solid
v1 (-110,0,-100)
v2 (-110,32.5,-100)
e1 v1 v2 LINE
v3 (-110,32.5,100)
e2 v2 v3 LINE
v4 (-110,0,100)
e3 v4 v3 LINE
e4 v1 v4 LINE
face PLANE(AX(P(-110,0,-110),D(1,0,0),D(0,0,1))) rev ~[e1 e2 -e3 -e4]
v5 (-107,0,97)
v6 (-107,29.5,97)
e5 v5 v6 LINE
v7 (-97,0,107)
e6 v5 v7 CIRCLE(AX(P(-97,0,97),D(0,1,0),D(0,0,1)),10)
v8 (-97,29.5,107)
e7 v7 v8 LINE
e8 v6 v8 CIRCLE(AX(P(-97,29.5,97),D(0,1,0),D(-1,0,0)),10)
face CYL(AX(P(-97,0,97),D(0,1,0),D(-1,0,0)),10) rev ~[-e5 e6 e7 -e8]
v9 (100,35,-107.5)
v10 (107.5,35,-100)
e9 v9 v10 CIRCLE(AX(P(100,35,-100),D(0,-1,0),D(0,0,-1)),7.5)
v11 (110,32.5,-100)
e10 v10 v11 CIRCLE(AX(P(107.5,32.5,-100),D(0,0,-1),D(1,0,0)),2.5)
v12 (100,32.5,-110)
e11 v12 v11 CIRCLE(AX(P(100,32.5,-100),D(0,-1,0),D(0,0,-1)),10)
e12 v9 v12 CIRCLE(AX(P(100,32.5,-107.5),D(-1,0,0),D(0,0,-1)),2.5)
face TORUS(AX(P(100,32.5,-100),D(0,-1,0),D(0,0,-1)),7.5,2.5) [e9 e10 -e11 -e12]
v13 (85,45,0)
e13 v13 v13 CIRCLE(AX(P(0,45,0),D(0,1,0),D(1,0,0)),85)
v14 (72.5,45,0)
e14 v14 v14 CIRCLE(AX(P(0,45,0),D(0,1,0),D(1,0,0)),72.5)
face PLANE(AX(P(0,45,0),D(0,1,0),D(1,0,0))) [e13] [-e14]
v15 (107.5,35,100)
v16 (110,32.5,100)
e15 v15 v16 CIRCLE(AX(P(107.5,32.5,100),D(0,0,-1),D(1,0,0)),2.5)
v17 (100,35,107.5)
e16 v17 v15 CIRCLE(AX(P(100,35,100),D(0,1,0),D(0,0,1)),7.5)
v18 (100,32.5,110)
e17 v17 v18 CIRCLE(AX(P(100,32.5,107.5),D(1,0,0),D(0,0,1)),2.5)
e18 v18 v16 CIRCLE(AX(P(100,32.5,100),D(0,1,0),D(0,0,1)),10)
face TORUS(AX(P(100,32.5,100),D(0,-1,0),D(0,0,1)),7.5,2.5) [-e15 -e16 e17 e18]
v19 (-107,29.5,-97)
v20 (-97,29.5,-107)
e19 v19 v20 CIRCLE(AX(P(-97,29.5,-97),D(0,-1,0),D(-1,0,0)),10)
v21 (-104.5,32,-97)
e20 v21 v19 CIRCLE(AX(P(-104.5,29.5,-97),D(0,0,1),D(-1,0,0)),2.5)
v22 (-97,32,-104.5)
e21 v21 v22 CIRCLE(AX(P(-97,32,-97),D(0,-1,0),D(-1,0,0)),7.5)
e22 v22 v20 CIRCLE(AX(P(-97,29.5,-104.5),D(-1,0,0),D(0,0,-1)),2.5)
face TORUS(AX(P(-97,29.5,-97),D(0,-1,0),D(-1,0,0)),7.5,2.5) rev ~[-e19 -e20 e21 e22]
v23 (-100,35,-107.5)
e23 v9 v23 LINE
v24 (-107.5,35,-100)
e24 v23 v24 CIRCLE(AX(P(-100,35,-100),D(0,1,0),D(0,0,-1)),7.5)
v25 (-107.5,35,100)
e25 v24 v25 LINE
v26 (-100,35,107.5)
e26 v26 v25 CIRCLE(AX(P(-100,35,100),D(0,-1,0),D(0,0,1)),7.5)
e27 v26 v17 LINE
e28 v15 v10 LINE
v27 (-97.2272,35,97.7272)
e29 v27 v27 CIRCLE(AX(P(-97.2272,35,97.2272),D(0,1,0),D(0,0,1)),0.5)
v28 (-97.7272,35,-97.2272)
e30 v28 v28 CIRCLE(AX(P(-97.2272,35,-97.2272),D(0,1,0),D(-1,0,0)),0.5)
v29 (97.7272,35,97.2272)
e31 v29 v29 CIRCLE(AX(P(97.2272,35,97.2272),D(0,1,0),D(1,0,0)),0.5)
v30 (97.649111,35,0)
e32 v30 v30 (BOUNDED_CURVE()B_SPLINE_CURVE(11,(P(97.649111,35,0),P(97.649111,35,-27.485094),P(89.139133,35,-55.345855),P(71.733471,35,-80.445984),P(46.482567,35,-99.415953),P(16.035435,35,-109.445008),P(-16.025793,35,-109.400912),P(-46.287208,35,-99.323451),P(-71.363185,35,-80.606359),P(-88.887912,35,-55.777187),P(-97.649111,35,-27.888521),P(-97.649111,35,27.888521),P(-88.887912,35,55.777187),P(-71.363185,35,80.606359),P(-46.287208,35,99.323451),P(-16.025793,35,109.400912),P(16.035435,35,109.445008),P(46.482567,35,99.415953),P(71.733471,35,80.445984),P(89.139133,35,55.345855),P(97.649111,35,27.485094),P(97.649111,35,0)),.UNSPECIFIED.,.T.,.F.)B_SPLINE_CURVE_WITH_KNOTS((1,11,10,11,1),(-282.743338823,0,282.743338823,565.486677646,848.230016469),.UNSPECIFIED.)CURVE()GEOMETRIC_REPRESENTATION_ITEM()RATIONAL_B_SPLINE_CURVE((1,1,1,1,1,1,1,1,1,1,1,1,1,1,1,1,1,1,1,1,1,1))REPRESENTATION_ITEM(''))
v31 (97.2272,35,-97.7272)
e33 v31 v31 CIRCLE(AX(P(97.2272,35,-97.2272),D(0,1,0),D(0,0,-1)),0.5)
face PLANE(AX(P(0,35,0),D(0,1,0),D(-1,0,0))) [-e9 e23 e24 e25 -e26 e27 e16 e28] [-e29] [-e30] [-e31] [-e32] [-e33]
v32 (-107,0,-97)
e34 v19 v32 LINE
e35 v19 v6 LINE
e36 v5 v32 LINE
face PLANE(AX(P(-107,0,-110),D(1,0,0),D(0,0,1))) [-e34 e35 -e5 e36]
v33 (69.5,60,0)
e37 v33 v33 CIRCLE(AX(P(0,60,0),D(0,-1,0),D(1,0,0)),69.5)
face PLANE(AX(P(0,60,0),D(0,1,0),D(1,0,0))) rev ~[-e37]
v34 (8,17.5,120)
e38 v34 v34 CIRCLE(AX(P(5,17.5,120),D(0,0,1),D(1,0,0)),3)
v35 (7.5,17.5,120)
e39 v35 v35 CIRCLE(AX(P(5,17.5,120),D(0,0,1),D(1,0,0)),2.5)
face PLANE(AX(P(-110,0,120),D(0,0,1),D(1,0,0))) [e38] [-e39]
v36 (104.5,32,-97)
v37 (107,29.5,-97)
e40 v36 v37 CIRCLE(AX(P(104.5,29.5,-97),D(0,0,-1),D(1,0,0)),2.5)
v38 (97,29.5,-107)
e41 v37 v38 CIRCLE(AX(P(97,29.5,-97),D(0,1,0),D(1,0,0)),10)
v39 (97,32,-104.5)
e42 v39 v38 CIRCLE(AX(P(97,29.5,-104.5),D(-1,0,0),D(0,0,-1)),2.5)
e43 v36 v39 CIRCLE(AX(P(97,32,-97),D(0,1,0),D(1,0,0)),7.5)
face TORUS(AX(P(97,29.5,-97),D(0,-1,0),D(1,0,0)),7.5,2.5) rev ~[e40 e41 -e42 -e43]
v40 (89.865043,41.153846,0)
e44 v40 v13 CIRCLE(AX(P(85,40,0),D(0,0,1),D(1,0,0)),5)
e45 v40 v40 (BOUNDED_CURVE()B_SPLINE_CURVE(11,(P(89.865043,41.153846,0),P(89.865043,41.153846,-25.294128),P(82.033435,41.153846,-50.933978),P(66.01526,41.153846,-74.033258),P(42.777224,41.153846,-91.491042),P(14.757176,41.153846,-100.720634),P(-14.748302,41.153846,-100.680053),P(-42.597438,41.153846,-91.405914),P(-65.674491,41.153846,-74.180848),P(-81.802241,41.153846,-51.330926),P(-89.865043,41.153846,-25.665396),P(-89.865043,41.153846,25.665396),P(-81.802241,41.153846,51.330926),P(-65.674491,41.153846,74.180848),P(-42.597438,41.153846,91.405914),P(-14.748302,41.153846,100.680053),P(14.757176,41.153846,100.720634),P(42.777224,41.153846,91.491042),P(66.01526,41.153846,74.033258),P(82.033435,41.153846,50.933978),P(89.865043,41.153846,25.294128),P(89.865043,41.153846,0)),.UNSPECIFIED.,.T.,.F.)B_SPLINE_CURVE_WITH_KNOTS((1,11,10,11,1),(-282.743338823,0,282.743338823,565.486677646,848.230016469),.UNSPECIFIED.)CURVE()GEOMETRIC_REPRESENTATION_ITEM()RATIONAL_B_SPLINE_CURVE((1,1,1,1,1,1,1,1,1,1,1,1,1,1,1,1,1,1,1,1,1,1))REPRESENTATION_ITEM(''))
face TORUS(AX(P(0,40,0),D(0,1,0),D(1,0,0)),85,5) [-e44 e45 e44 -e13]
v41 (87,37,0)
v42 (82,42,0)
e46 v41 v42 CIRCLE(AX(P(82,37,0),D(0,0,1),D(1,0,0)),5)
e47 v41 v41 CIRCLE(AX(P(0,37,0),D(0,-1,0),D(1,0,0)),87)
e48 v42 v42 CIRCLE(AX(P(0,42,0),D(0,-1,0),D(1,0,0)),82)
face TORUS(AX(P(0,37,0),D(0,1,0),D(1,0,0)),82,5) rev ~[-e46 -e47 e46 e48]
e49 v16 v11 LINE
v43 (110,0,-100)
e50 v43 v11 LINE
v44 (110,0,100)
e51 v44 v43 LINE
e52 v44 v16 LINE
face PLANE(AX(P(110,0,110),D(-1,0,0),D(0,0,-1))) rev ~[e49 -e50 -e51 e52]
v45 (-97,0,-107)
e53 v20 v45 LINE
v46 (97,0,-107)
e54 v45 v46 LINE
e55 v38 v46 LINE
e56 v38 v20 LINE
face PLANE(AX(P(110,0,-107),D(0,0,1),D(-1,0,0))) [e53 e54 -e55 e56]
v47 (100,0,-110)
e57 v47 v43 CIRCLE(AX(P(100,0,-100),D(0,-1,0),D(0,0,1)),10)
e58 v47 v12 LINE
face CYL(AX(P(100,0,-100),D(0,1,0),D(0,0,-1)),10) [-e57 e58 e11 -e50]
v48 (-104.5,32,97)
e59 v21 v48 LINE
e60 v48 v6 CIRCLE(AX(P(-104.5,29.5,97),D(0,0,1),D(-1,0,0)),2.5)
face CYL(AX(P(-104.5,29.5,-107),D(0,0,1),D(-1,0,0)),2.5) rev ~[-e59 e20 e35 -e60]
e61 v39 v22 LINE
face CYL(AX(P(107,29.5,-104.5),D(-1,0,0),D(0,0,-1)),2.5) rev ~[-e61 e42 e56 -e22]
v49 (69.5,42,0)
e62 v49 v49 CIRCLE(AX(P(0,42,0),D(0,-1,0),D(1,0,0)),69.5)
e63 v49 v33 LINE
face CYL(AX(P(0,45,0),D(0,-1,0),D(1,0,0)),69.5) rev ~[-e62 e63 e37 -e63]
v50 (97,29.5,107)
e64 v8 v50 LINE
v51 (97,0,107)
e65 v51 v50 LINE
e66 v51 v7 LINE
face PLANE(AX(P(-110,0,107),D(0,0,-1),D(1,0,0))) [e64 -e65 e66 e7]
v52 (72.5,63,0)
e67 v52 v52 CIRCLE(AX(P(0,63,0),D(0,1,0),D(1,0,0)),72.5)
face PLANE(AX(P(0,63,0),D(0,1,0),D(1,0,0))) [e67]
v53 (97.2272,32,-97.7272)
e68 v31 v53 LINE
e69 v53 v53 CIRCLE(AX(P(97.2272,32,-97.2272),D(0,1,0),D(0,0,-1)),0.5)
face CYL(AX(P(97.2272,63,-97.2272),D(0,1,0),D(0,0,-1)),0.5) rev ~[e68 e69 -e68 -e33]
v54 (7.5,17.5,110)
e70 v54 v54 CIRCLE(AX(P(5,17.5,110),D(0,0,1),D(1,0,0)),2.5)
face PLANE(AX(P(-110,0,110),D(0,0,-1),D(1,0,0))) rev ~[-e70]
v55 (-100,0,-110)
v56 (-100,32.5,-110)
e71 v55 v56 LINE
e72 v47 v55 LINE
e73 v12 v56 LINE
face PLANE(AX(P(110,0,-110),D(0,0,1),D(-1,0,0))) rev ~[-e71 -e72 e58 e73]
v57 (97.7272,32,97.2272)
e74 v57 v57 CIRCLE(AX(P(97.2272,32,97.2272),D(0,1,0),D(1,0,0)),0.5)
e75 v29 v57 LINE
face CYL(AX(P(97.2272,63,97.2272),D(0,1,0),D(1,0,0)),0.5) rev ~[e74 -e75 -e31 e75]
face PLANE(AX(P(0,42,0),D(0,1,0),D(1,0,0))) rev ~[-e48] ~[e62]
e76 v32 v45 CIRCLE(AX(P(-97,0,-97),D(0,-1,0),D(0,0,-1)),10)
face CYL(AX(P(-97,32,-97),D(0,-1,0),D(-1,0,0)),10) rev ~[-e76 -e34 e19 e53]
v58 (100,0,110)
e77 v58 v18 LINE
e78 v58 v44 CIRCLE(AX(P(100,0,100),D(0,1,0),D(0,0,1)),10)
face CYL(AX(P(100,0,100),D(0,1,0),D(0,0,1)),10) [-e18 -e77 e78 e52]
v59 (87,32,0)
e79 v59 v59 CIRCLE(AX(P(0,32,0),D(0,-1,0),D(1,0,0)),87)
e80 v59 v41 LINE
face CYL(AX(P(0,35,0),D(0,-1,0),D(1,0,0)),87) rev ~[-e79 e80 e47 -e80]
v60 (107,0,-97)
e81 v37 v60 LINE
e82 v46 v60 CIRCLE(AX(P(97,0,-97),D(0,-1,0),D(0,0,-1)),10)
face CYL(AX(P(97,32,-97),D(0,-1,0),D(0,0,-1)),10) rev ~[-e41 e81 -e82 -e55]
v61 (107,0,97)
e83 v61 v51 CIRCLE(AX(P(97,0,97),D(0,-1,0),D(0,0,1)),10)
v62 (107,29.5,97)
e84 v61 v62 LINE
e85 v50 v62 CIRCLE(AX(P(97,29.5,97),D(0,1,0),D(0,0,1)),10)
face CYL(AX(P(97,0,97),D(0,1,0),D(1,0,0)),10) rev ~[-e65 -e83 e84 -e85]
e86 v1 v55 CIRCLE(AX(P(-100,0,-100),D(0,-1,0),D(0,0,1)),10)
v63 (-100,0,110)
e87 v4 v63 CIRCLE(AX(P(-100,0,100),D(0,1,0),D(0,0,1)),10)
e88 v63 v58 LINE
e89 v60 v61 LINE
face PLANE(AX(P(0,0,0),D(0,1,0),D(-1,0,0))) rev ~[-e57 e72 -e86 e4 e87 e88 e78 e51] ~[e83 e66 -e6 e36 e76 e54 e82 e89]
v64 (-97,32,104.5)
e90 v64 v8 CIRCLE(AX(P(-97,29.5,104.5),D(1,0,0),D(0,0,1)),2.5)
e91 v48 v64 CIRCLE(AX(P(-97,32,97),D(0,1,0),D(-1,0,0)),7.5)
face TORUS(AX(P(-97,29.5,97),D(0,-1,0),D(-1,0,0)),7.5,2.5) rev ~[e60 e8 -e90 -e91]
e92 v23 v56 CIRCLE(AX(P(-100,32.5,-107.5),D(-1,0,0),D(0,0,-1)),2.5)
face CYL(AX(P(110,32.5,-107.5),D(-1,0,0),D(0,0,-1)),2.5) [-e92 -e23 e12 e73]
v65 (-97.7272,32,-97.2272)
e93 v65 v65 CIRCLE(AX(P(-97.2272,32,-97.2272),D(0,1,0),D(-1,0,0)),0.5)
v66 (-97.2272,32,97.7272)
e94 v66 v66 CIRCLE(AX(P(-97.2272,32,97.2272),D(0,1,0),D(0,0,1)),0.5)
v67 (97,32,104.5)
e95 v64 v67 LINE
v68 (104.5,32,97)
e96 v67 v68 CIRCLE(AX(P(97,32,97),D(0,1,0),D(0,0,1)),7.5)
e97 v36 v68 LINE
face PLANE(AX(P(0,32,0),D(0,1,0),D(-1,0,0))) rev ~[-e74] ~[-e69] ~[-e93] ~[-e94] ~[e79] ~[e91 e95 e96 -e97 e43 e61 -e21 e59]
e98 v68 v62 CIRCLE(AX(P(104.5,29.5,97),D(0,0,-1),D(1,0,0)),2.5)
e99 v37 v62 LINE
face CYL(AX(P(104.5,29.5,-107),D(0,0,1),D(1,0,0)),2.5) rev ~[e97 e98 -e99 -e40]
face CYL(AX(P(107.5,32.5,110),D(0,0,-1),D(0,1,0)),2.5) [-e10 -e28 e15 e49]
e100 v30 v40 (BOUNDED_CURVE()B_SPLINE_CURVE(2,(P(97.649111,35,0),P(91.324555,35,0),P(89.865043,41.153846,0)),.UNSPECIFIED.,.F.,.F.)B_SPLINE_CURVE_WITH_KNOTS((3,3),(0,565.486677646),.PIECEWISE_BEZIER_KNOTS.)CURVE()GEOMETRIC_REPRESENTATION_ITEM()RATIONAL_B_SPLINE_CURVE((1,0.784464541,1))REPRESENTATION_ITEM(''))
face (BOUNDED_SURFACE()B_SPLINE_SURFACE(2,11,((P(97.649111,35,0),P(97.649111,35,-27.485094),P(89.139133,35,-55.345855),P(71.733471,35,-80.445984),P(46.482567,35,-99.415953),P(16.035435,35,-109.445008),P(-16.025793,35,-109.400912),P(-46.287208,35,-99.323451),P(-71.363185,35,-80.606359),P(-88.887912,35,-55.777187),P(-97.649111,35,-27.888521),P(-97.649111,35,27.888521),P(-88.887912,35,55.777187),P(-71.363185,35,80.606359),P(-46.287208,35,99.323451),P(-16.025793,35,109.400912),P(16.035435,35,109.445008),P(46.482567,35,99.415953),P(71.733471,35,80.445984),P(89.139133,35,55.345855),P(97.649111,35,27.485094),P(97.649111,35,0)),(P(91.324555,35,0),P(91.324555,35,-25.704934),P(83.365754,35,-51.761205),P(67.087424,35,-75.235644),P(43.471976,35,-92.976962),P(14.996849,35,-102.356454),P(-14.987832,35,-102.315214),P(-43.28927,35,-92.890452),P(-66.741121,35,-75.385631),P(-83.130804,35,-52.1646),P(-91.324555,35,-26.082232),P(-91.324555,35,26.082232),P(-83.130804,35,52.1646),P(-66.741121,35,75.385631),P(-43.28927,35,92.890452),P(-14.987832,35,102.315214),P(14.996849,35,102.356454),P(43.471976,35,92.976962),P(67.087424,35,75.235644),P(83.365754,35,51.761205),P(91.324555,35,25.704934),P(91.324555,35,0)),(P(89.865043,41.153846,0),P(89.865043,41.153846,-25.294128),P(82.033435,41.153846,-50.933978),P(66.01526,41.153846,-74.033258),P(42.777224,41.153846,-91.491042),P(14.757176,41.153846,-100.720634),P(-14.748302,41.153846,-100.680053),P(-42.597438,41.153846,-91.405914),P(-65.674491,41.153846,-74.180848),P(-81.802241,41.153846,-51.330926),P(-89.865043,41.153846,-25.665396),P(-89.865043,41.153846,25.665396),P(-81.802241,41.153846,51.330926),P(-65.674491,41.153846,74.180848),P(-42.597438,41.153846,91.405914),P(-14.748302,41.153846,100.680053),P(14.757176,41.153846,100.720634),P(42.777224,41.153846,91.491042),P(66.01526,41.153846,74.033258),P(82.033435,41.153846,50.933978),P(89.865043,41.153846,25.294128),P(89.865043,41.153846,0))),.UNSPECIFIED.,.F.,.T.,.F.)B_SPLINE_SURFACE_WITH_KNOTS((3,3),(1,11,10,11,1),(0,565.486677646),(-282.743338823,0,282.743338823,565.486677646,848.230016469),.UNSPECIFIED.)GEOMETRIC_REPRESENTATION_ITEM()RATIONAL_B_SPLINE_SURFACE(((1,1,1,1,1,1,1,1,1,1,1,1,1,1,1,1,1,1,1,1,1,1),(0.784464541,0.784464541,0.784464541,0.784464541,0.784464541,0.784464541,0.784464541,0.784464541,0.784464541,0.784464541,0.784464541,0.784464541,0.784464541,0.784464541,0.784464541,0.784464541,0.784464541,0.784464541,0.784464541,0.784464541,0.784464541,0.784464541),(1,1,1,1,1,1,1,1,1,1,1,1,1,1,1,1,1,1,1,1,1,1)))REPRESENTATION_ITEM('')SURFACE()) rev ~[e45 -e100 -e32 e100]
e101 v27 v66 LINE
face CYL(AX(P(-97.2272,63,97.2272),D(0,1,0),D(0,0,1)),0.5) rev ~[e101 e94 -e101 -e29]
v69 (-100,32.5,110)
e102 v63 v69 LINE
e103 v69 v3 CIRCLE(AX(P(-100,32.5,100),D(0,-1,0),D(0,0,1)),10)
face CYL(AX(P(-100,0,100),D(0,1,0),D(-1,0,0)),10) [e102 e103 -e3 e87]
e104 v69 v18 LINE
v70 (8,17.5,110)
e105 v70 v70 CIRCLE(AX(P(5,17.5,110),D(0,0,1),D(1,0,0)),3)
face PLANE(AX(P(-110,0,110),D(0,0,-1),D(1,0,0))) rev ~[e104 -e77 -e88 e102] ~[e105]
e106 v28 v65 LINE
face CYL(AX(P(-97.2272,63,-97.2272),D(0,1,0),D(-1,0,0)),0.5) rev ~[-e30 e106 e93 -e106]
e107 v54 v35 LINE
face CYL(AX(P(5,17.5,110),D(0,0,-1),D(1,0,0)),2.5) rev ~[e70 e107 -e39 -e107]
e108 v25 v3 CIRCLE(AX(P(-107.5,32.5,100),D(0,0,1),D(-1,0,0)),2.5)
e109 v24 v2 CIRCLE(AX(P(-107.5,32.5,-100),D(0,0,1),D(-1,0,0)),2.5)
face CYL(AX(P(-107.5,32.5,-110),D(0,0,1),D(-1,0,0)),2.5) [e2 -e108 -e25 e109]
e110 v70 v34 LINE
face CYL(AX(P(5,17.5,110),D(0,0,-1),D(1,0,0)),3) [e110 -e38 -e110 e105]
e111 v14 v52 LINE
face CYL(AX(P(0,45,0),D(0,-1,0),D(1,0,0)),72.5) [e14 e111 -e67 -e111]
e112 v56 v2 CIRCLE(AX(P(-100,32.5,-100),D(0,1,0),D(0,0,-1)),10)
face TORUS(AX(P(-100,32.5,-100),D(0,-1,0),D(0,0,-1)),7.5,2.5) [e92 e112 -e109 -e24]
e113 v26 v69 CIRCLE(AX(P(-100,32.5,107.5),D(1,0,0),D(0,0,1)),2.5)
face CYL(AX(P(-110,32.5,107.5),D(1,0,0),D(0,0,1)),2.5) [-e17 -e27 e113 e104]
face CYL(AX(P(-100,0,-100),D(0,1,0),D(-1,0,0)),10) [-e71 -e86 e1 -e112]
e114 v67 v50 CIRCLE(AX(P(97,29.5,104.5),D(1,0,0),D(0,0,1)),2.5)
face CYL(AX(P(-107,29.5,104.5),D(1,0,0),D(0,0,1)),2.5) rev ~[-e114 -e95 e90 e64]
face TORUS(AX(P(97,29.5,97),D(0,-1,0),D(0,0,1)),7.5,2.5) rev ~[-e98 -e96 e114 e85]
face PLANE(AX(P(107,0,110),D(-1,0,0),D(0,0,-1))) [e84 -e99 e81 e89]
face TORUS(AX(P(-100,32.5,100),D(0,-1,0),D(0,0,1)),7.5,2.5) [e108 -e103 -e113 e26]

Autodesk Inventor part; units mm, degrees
ref_plane "YZ Plane" through (0, 0, 0) normal (1, 0, 0) x (0, 1, 0)
ref_plane "XZ Plane" through (0, 0, 0) normal (0, 1, 0) x (-1, 0, 0)
ref_plane "XY Plane" through (0, 0, 0) normal (0, 0, 1) x (1, 0, 0)
sketch "Sketch1" plane through (0, 0, 0) normal (0, 1, 0) x (-1, 0, 0)
  line L0 (110, 110) -> (-110, 110)
  line L1 (-110, 110) -> (-110, -110)
  line L2 (-110, -110) -> (110, -110)
  line L3 (110, -110) -> (110, 110)
  point P0 (0, 0)
  point P1 (110, 0)
  point P2 (0, -110)
  dimension "d0" = 220
extrude "Extrusion1" add sketch "Sketch1" along normal blind 35
sketch "Sketch2" plane through (0, 35, 0) normal (0, 1, 0) x (1, 0, 0)
  circle A0 centre (0, 0) radius 90
  dimension "d3" = 180
extrude "Extrusion2" add sketch "Sketch2" along normal blind 10
sketch "Sketch3" plane through (0, 45, 0) normal (0, 1, 0) x (1, 0, 0)
  circle A0 centre (0, 0) radius 72.5
  dimension "d6" = 145
extrude "Extrusion3" add sketch "Sketch3" along normal blind 18
sketch "Sketch4" plane through (-110, 0, 110) normal (0, 0, 1) x (1, 0, 0)
  circle A0 centre (115, 17.5) radius 3
  line L0 (220, 0) -> (220, 35) projected
  circle A1 centre (115, 17.5) radius 2.5
  point P0 (110, 0)
  dimension "d9" = 6
  dimension "d10" = 105
  dimension "d11" = 17.5
  dimension "d33" = 0.5
  dimension "d34" = 5
shell "Shell1" thickness 3 removed faces 1 at (36.6667, 0, 36.6667)
fillet "Fillet1" radius 10 4 edges at (110, 17.5, 110) (-110, 17.5, 110) (110, 17.5, -110) (-110, 17.5, -110)
fillet "Fillet1" radius 2.5 4 edges at (0, 35, 110) (0, 35, -110) (-110, 35, 0) (110, 35, 0)
fillet "Fillet1" radius 5 1 edges at (-90, 45, 0)
fillet "Fillet3" radius 8 1 edges at (-90, 35, 0)
fillet "Fillet4" radius 10 4 edges at (-107, 16, -107) (-107, 16, 107) (107, 16, 107) (107, 16, -107)
fillet "Fillet4" radius 2.5 4 edges at (-107, 32, 0) (0, 32, 107) (107, 32, 0) (0, 32, -107)
fillet "Fillet4" radius 5 1 edges at (-87, 42, 0)
sketch "Sketch5" plane through (0, 63, 0) normal (0, 1, 0) x (1, 0, 0)
  circle A0 centre (0, 0) radius 137.5 construction
  line L0 (0, 0) -> (114.1894, -114.1894) construction
  line L1 (0, 0) -> (161.4882, 0) construction
  line L2 (114.1894, -114.1894) -> (-122.4575, 122.4575) construction
  line L3 (118.52, 118.52) -> (-114.1894, -114.1894) construction
  circle A1 centre (97.2272, -97.2272) radius 0.5
  dimension "d23" = 275
  dimension "d24" = 45
  dimension "d25" = 1
extrude "Extrusion5" cut sketch "Sketch5" against normal through all
pattern_circular "Circular Pattern1" count 4 over 360 about axis through (0, -10, 0) along (0, 1, 0) of "Extrusion5"
extrude "Extrusion6" add sketch "Sketch4" along normal blind 10
properties part number "Hot Plate"
